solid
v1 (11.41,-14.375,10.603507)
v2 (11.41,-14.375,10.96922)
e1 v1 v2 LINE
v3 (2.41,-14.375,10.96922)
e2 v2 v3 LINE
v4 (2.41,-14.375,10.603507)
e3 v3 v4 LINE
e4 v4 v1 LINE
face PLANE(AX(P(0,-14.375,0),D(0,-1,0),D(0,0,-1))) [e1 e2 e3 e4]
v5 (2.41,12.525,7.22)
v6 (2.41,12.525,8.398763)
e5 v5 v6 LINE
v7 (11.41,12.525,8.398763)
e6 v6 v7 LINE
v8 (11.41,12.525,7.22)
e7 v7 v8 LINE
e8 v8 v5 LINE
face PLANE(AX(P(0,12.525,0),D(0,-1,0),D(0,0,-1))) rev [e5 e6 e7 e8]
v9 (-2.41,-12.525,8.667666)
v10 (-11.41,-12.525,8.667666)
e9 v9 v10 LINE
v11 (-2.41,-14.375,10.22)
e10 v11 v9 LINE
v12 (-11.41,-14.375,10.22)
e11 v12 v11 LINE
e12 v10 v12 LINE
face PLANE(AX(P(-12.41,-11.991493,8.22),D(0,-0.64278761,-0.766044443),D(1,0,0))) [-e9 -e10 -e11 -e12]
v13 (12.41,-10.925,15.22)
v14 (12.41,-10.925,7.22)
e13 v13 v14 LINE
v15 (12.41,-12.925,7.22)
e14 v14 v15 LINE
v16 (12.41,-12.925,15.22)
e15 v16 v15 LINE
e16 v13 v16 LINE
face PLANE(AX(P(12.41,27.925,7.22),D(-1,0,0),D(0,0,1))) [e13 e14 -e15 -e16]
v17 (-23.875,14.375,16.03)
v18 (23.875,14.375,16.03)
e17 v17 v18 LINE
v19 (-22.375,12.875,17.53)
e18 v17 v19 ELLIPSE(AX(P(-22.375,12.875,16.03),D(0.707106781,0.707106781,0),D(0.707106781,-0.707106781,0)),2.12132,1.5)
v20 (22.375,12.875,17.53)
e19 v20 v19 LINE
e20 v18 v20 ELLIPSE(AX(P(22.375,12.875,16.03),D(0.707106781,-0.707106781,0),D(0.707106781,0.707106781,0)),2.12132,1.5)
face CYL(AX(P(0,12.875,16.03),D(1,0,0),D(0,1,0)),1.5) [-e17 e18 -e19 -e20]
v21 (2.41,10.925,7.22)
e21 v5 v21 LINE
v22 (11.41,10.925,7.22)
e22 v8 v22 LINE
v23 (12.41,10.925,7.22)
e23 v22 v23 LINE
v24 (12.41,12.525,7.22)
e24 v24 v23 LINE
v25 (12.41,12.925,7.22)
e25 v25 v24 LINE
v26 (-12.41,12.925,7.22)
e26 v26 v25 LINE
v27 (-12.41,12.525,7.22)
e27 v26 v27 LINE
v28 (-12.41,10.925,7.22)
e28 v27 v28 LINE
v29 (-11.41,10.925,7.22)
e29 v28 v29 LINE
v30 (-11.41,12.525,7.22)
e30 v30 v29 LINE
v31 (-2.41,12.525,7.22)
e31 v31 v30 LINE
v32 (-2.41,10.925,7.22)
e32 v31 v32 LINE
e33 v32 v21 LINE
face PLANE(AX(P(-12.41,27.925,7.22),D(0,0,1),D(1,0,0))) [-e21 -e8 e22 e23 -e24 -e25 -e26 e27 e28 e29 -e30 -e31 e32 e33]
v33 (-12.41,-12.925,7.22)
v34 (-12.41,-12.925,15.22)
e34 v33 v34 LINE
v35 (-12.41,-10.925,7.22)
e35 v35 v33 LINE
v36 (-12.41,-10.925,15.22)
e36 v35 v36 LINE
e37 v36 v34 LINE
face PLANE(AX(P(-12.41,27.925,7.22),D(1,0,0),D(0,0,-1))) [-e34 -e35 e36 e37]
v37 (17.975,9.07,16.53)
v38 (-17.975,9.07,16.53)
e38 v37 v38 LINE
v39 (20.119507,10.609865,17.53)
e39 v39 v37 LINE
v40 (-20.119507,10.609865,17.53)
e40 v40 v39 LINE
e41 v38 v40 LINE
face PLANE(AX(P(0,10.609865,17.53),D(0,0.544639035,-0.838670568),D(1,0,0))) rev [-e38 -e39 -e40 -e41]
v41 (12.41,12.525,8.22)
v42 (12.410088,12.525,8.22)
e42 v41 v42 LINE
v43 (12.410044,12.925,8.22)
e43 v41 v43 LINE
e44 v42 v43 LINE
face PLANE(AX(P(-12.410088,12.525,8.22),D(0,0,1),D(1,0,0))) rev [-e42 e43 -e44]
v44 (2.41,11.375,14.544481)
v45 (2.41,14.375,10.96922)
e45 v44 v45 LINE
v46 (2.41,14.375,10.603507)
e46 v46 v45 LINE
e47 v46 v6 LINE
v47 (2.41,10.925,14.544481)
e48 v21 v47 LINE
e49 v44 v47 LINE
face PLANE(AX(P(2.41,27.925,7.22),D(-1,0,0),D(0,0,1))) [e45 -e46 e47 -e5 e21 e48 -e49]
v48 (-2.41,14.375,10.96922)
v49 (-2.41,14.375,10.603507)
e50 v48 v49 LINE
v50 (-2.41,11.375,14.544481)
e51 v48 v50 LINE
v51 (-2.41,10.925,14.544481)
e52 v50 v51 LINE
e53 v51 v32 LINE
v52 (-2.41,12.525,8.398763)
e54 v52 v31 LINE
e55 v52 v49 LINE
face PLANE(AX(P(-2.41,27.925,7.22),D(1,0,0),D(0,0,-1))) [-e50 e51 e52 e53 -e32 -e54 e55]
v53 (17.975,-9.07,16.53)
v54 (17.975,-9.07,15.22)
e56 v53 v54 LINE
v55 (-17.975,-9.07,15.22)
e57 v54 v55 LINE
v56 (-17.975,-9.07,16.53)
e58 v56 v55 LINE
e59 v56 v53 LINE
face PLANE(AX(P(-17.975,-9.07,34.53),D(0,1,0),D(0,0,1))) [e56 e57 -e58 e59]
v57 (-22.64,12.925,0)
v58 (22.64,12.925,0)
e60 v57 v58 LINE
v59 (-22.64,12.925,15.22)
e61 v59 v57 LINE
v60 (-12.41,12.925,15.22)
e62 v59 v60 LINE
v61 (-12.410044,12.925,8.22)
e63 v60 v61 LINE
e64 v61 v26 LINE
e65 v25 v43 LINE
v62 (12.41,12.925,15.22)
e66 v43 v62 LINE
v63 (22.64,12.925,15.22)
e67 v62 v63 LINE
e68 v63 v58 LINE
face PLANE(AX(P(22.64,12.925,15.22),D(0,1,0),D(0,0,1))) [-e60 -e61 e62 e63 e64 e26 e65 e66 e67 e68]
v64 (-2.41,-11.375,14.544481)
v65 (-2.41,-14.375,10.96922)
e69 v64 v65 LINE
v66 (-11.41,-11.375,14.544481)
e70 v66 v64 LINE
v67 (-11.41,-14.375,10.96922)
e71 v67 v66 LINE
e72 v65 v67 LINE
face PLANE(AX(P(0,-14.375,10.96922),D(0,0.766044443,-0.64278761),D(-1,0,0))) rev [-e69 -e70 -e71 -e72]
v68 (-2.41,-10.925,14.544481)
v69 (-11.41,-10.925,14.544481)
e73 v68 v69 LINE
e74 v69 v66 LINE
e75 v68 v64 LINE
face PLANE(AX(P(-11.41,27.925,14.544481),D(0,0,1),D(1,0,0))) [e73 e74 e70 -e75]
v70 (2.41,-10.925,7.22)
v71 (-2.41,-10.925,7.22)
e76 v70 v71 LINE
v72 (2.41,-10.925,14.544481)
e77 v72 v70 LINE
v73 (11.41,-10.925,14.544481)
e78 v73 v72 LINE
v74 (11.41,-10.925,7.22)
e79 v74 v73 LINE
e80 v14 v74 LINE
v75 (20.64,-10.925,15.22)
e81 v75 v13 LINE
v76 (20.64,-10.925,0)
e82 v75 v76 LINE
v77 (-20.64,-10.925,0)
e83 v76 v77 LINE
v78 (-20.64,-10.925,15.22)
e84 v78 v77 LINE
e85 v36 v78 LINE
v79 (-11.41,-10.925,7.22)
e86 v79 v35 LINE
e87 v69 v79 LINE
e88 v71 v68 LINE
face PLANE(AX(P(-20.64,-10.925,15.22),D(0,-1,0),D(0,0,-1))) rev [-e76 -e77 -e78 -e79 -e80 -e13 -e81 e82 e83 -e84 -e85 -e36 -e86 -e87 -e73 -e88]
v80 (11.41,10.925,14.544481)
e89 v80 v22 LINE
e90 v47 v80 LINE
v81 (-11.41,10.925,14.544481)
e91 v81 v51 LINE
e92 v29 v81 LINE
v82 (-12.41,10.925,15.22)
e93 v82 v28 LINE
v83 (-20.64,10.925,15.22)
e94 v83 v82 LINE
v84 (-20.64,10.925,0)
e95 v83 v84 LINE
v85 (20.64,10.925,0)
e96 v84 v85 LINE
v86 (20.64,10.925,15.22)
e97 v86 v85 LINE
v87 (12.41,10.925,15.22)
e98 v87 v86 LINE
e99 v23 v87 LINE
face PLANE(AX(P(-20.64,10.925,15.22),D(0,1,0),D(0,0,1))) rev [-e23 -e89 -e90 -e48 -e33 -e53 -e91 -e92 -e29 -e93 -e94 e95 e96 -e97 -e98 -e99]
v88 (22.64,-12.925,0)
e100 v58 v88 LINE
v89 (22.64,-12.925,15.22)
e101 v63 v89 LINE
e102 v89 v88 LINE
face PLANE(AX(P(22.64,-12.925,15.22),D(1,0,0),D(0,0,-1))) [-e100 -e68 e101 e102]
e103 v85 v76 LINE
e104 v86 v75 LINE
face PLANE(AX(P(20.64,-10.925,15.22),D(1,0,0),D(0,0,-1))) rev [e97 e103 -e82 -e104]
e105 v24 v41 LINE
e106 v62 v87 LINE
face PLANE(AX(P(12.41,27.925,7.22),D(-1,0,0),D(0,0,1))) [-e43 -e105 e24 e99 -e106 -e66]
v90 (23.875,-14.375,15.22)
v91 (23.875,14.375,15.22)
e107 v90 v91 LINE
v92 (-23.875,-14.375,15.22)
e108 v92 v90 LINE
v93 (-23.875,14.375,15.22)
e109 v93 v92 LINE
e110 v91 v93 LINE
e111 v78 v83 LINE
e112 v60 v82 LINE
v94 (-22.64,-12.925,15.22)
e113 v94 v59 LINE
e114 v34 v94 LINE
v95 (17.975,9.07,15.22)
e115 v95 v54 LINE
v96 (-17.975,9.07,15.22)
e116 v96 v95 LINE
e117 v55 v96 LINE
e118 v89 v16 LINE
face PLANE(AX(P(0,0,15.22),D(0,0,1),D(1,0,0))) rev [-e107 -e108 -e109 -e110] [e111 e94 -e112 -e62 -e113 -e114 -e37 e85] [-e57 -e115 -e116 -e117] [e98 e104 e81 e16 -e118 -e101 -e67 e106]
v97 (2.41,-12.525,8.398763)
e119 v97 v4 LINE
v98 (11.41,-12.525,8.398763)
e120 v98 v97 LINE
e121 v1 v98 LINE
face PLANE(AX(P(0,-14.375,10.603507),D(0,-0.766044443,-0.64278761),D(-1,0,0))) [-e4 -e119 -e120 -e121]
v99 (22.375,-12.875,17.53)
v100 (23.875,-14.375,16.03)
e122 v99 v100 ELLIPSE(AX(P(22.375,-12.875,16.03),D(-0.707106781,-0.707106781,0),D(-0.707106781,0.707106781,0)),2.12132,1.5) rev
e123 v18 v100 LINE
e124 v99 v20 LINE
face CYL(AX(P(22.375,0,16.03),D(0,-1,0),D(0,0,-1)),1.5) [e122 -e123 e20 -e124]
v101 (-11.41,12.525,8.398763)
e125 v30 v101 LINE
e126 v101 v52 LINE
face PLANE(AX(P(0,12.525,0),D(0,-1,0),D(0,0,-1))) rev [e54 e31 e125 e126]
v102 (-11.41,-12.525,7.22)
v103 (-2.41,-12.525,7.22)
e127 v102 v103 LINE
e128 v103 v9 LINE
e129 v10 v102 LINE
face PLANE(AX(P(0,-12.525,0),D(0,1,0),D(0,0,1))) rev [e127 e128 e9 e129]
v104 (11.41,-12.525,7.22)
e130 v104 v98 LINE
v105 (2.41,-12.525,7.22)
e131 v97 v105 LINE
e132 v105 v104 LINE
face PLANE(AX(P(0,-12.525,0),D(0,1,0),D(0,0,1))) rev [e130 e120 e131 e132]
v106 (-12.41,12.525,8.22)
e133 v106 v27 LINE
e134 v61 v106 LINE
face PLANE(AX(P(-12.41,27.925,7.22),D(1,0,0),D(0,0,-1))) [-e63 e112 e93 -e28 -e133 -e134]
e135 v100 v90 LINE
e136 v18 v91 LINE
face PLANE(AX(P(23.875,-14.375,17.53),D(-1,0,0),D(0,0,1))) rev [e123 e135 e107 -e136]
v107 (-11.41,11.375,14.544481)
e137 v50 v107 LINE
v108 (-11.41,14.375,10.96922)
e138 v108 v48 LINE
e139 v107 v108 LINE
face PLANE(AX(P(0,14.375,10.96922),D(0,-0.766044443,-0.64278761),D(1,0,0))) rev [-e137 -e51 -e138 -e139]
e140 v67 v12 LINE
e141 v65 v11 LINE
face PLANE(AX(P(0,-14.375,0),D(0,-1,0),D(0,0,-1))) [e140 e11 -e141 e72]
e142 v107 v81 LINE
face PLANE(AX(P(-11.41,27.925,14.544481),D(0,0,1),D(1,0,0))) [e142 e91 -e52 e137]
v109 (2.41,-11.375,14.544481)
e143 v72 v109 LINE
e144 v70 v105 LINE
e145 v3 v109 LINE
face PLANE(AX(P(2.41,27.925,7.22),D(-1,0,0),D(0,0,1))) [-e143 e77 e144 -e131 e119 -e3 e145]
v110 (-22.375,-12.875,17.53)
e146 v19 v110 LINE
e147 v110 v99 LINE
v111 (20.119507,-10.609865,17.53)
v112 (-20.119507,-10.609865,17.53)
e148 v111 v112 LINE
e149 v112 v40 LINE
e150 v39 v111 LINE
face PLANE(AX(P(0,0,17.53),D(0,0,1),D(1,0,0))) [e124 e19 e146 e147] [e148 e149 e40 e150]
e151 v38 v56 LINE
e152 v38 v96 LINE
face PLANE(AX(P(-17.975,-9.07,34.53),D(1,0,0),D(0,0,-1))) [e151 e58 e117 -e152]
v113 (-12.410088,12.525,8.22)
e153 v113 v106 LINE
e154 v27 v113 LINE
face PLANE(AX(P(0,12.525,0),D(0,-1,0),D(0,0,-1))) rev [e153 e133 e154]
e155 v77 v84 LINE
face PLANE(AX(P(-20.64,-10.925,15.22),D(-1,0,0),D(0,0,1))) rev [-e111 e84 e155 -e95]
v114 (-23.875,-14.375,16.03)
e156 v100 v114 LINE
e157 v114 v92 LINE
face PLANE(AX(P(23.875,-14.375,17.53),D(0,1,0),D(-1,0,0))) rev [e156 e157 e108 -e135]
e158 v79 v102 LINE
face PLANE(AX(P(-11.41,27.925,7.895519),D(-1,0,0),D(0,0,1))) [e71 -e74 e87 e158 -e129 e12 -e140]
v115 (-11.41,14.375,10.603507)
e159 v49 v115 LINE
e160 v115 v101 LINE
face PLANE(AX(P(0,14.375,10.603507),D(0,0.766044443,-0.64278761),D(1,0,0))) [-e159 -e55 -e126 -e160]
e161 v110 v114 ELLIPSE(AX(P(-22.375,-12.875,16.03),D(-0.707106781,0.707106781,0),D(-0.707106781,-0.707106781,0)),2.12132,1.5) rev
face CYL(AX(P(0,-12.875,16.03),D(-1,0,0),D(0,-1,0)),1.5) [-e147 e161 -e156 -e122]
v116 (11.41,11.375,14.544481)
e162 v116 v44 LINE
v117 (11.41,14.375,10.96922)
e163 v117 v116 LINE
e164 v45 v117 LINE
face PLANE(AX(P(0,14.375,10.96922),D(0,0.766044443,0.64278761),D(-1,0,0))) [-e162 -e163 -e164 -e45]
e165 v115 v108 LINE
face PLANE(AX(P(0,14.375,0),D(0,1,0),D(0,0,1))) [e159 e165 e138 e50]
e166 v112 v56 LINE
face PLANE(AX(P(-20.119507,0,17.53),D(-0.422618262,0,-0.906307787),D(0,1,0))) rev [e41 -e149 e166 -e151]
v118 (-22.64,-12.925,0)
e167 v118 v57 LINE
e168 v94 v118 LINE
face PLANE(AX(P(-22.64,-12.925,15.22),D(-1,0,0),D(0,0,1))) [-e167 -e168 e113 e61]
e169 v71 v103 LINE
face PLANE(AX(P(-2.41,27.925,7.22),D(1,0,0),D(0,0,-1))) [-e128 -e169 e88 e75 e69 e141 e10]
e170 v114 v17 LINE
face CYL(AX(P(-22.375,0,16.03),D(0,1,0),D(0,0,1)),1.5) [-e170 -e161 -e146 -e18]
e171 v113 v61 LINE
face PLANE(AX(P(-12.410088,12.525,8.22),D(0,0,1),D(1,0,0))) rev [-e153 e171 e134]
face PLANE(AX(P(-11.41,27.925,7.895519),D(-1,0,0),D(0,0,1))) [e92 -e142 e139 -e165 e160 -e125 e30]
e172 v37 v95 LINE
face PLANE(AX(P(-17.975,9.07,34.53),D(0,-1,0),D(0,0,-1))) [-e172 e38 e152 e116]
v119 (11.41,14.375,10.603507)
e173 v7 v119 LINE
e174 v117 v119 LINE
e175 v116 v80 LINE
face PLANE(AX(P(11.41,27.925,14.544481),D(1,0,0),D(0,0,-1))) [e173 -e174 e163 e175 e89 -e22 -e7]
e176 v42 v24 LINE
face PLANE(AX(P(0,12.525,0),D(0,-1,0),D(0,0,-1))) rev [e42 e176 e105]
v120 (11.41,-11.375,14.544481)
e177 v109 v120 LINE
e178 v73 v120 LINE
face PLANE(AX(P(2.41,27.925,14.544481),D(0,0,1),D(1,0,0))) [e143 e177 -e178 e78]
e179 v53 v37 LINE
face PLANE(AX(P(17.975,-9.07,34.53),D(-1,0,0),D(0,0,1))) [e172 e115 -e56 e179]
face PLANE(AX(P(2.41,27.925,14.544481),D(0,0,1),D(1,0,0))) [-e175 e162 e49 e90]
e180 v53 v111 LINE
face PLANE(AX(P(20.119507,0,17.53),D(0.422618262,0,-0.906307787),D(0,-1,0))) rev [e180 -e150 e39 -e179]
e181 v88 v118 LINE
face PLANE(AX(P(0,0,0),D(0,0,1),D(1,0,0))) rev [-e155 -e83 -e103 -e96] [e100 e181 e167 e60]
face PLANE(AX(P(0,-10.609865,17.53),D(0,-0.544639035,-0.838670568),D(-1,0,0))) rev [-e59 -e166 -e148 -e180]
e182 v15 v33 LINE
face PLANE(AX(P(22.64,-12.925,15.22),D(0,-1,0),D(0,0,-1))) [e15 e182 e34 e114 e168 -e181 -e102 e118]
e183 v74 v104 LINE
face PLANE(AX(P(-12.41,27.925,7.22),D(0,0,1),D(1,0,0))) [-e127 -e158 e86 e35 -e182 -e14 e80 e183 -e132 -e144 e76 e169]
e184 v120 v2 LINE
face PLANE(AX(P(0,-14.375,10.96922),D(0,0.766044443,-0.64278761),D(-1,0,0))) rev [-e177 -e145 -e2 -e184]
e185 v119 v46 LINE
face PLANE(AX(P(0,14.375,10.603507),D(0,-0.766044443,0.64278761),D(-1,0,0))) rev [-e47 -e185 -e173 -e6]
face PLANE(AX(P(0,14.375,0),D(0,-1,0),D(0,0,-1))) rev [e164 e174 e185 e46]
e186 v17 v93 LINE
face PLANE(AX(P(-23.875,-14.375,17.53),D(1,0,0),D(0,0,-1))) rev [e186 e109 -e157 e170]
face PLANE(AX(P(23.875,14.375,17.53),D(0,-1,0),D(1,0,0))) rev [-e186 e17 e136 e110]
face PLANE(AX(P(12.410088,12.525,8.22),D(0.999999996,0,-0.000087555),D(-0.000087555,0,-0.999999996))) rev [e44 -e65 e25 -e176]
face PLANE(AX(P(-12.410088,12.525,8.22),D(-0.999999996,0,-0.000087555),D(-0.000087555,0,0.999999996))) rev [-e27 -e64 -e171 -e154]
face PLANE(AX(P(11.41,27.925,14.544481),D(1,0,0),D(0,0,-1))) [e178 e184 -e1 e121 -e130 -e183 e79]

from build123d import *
from OCP.BRepFilletAPI import BRepFilletAPI_MakeChamfer

# Parameters (mm, degrees)
ESBO_O1_W                  = 47.75
ESBO_O1_H                  = 28.75
RESSALTO_EXTRUS_O1_DEPTH   = 17.53
ESBO_O3_W                  = 55.113346814
ESBO_O3_H                  = 32.23245858
ESBO_O3_W_2                = 45.28
ESBO_O3_H_2                = 25.85
CORTE_EXTRUS_O1_DEPTH      = 15.22
CORTE_EXTRUS_O2_DEPTH      = 17
CORTE_EXTRUS_O2_DEPTH_BACK = 33.22
ESBO_O4_W                  = 35.95
ESBO_O4_H                  = 18.14
ESBO_O5_W                  = 41.28
ESBO_O5_H                  = 21.85
CORTE_EXTRUS_O3_DEPTH      = 15.22
CHANFRO1_SIZE              = 1
CHANFRO1_SIZE2             = 2.144506921
CHANFRO2_SIZE              = 1
CHANFRO2_SIZE2             = 2.144506921
CHANFRO3_SIZE              = 1
CHANFRO3_SIZE2             = 1.539864964
FILETE1_R                  = 1.5
CORTE_EXTRUS_O4_DEPTH      = 15
CORTE_EXTRUS_O4_DEPTH_BACK = 44.22
CORTE_EXTRUS_O5_DEPTH      = 0.4
ESBO_O8_W                  = 24.82
ESBO_O8_H                  = 1
CORTE_EXTRUS_O6_DEPTH      = 0.4
ESBO_O9_W                  = 9
ESBO_O9_H                  = 6.324480946
RESSALTO_EXTRUS_O2_DEPTH   = 1.45
ESBO_O10_W                 = 9
ESBO_O10_H                 = 6.324480946
RESSALTO_EXTRUS_O3_DEPTH   = 1.45
ESBO_O11_W                 = 9
ESBO_O11_H                 = 6.324480946
RESSALTO_EXTRUS_O4_DEPTH   = 1.45
CHANFRO4_SIZE              = 3
CHANFRO4_SIZE2             = 3.575260778


with BuildPart() as part:
    # Esboço1 → Ressalto-extrusão1 (new body)
    with BuildSketch(Plane.XY):
        Rectangle(ESBO_O1_W, ESBO_O1_H)
    extrude(amount=RESSALTO_EXTRUS_O1_DEPTH)

    # Esboço3 → Corte-extrusão1 (cut)
    with BuildSketch(Plane(origin=(0, 0, 0), x_dir=(-1, 0, 0), z_dir=(0, 0, -1))):
        Rectangle(ESBO_O3_W, ESBO_O3_H)
        Rectangle(ESBO_O3_W_2, ESBO_O3_H_2, mode=Mode.SUBTRACT)
    extrude(amount=-CORTE_EXTRUS_O1_DEPTH, mode=Mode.SUBTRACT)

    # Esboço4 → Corte-extrusão2 (cut, two sides: drawn at the far end of the back side and taken through both)
    with BuildSketch(Plane.XY.offset(17.53).offset(-CORTE_EXTRUS_O2_DEPTH_BACK)):
        Rectangle(ESBO_O4_W, ESBO_O4_H)
    extrude(amount=CORTE_EXTRUS_O2_DEPTH + CORTE_EXTRUS_O2_DEPTH_BACK, mode=Mode.SUBTRACT)

    # Esboço5 → Corte-extrusão3 (cut)
    with BuildSketch(Plane(origin=(0, 0, 0), x_dir=(-1, 0, 0), z_dir=(0, 0, -1))):
        Rectangle(ESBO_O5_W, ESBO_O5_H)
    extrude(amount=-CORTE_EXTRUS_O3_DEPTH, mode=Mode.SUBTRACT)

    # Chanfro1
    chanfro1_edges = [part.edges().sort_by_distance(p)[0] for p in [
        (17.975, 0, 17.53),
    ]]
    chanfro1_side = [part.faces().sort_by_distance(p)[0] for p in [
        (17.975, 0, 16.375),
    ]]
    chamfer(chanfro1_edges, length=CHANFRO1_SIZE, length2=CHANFRO1_SIZE2, reference=chanfro1_side[0])

    # Chanfro2
    chanfro2_edges = [part.edges().sort_by_distance(p)[0] for p in [
        (-17.975, 0, 17.53),
    ]]
    chanfro2_side = [part.faces().sort_by_distance(p)[0] for p in [
        (-17.975, 0, 16.375),
    ]]
    chamfer(chanfro2_edges, length=CHANFRO2_SIZE, length2=CHANFRO2_SIZE2, reference=chanfro2_side[0])

    # Chanfro3: one chamfer whose edges measure the first distance from different faces: ONE call of the kernel's chamfer builder (chamfer() names one face for all edges)
    chanfro3_edges_1 = [part.edges().sort_by_distance(p)[0] for p in [
        (0, -9.07, 17.53),
    ]]
    chanfro3_side_1 = [part.faces().sort_by_distance(p)[0] for p in [
        (0, -9.07, 16.39568424),
    ]]
    chanfro3_edges_2 = [part.edges().sort_by_distance(p)[0] for p in [
        (0, 9.07, 17.53),
    ]]
    chanfro3_side_2 = [part.faces().sort_by_distance(p)[0] for p in [
        (0, 9.07, 16.39568424),
    ]]
    chanfro3 = BRepFilletAPI_MakeChamfer(part.part.solid().wrapped)
    for e in chanfro3_edges_1:
        chanfro3.Add(CHANFRO3_SIZE, CHANFRO3_SIZE2, e.wrapped, chanfro3_side_1[0].wrapped)  # the first distance lies on this face
    for e in chanfro3_edges_2:
        chanfro3.Add(CHANFRO3_SIZE, CHANFRO3_SIZE2, e.wrapped, chanfro3_side_2[0].wrapped)  # the first distance lies on this face
    add(Compound.cast(chanfro3.Shape()), mode=Mode.REPLACE)

    # Filete1
    filete1_edges = [part.edges().sort_by_distance(p)[0] for p in [
        (23.875, 0, 17.53),
        (0, 14.375, 17.53),
        (-23.875, 0, 17.53),
        (0, -14.375, 17.53),
    ]]
    fillet(filete1_edges, radius=FILETE1_R)

    # Esboço6 → Corte-extrusão4 (cut, two sides: drawn at the far end of the back side and taken through both)
    with BuildSketch(Plane(origin=(0, 12.925, 0), x_dir=(1, 0, 0), z_dir=(0, 1, 0)).offset(-CORTE_EXTRUS_O4_DEPTH_BACK)):
        Polygon((-11.41, -7.895519054), (-11.41, -7.22), (-12.41, -7.22), (-12.41, -15.22), (12.41, -15.22), (12.41, -7.22), (11.41, -7.22), (11.41, -7.895519054), (11.41, -14.544480946), (2.41, -14.544480946), (2.41, -7.22), (-2.41, -7.22), (-2.41, -14.544480946), (-11.41, -14.544480946), align=None)
    extrude(amount=CORTE_EXTRUS_O4_DEPTH + CORTE_EXTRUS_O4_DEPTH_BACK, mode=Mode.SUBTRACT)

    # Esboço7 → Corte-extrusão5 (cut)
    with BuildSketch(Plane(origin=(0, 12.925, 0), x_dir=(1, 0, 0), z_dir=(0, 1, 0))):
        Polygon((-12.410087555, -8.22), (12.410087555, -8.22), (12.41, -7.22), (-12.41, -7.22), align=None)
    extrude(amount=-CORTE_EXTRUS_O5_DEPTH, mode=Mode.SUBTRACT)

    # Esboço8 → Corte-extrusão6 (cut)
    with BuildSketch(Plane.XZ.offset(12.925)):
        with Locations((0, 7.72)):
            Rectangle(ESBO_O8_W, ESBO_O8_H)
    extrude(amount=-CORTE_EXTRUS_O6_DEPTH, mode=Mode.SUBTRACT)

    # Esboço9 → Ressalto-extrusão2 (add)
    with BuildSketch(Plane(origin=(0, 12.925, 0), x_dir=(1, 0, 0), z_dir=(0, 1, 0))):
        with Locations((-6.91, -11.382240473)):
            Rectangle(ESBO_O9_W, ESBO_O9_H)
    extrude(amount=RESSALTO_EXTRUS_O2_DEPTH)

    # Esboço10 → Ressalto-extrusão3 (add)
    with BuildSketch(Plane(origin=(0, 12.925, 0), x_dir=(1, 0, 0), z_dir=(0, 1, 0))):
        with Locations((6.91, -11.382240473)):
            Rectangle(ESBO_O10_W, ESBO_O10_H)
    extrude(amount=RESSALTO_EXTRUS_O3_DEPTH)

    # Esboço11 → Ressalto-extrusão4 (add)
    with BuildSketch(Plane.XZ.offset(12.925)):
        with Locations((6.91, 11.382240473)):
            Rectangle(ESBO_O11_W, ESBO_O11_H)
        Polygon((-2.41, 8.22), (-2.41, 14.544480946), (-6.91, 14.544480946), (-11.41, 14.544480946), (-11.41, 8.22), align=None)
    extrude(amount=RESSALTO_EXTRUS_O4_DEPTH)

    # Chanfro4: one chamfer whose edges measure the first distance from different faces: ONE call of the kernel's chamfer builder (chamfer() names one face for all edges)
    chanfro4_edges_1 = [part.edges().sort_by_distance(p)[0] for p in [
        (-6.91, 14.375, 14.544480946),
    ]]
    chanfro4_side_1 = [part.faces().sort_by_distance(p)[0] for p in [
        (-6.91, 12.65, 14.544480946),
    ]]
    chanfro4_edges_2 = [part.edges().sort_by_distance(p)[0] for p in [
        (6.91, 14.375, 14.544480946),
    ]]
    chanfro4_side_2 = [part.faces().sort_by_distance(p)[0] for p in [
        (6.91, 12.65, 14.544480946),
    ]]
    chanfro4_edges_3 = [part.edges().sort_by_distance(p)[0] for p in [
        (6.91, -14.375, 14.544480946),
    ]]
    chanfro4_side_3 = [part.faces().sort_by_distance(p)[0] for p in [
        (6.91, -12.65, 14.544480946),
    ]]
    chanfro4_edges_4 = [part.edges().sort_by_distance(p)[0] for p in [
        (-6.91, -14.375, 14.544480946),
    ]]
    chanfro4_side_4 = [part.faces().sort_by_distance(p)[0] for p in [
        (-6.91, -12.65, 14.544480946),
    ]]
    chanfro4 = BRepFilletAPI_MakeChamfer(part.part.solid().wrapped)
    for e in chanfro4_edges_1:
        chanfro4.Add(CHANFRO4_SIZE, CHANFRO4_SIZE2, e.wrapped, chanfro4_side_1[0].wrapped)  # the first distance lies on this face
    for e in chanfro4_edges_2:
        chanfro4.Add(CHANFRO4_SIZE, CHANFRO4_SIZE2, e.wrapped, chanfro4_side_2[0].wrapped)  # the first distance lies on this face
    for e in chanfro4_edges_3:
        chanfro4.Add(CHANFRO4_SIZE, CHANFRO4_SIZE2, e.wrapped, chanfro4_side_3[0].wrapped)  # the first distance lies on this face
    for e in chanfro4_edges_4:
        chanfro4.Add(CHANFRO4_SIZE, CHANFRO4_SIZE2, e.wrapped, chanfro4_side_4[0].wrapped)  # the first distance lies on this face
    add(Compound.cast(chanfro4.Shape()), mode=Mode.REPLACE)

    # Chanfro5
    # the kernel refuses this chamfer: 2.383507185, 2 mm, written as the material it takes off along each edge
    with BuildSketch(Plane(origin=(-11.41, 14.375, 8.22), x_dir=(0, 0.024939322090234445, 0.9996889667359941), z_dir=(1, 0, 0))) as chanfro5_piece_1_section:
        with BuildLine():
            Line((2.457306387, 0), (-0.124419196, 2.058820987))
            Line((-0.124419196, 2.058820987), (-0.172074512, 2.057632126))
            ThreePointArc((-0.172074512, 2.057632126), (-0.073358824, 1.029132353), (-0.047655317, -0.001188861))
            Line((-0.047655317, -0.001188861), (0.001188861, -0.047655317))
            ThreePointArc((0.001188861, -0.047655317), (1.229077869, -0.01702307), (2.458495248, -0.047655317))
            Line((2.458495248, -0.047655317), (2.457306387, 0))
        make_face()
    chanfro5_piece_1 = extrude(amount=9, mode=Mode.PRIVATE)
    chanfro5_piece_1 = split(chanfro5_piece_1, bisect_by=Plane(origin=(-6.91, 12.525, 9.020332746), z_dir=(0, 1, 0)), keep=Keep.TOP, mode=Mode.PRIVATE)
    add(chanfro5_piece_1, mode=Mode.SUBTRACT)
    with BuildSketch(Plane(origin=(11.41, 14.375, 8.22), x_dir=(0, 0.024939322090234445, 0.9996889667359941), z_dir=(-1, 0, 0))) as chanfro5_piece_2_section:
        with BuildLine():
            Line((2.457306387, 0), (-0.124419196, -2.058820987))
            Line((-0.124419196, -2.058820987), (-0.172074512, -2.057632126))
            ThreePointArc((-0.172074512, -2.057632126), (-0.073358824, -1.029132353), (-0.047655317, 0.001188861))
            Line((-0.047655317, 0.001188861), (0.001188861, 0.047655317))
            ThreePointArc((0.001188861, 0.047655317), (1.229077869, 0.01702307), (2.458495248, 0.047655317))
            Line((2.458495248, 0.047655317), (2.457306387, 0))
        make_face()
    chanfro5_piece_2 = extrude(amount=9, mode=Mode.PRIVATE)
    chanfro5_piece_2 = split(chanfro5_piece_2, bisect_by=Plane(origin=(6.91, 12.525, 9.020332746), z_dir=(0, 1, 0)), keep=Keep.TOP, mode=Mode.PRIVATE)
    add(chanfro5_piece_2, mode=Mode.SUBTRACT)
    with BuildSketch(Plane(origin=(2.41, -14.375, 8.22), x_dir=(0, -0.024939322090234445, 0.9996889667359941), z_dir=(1, 0, 0))) as chanfro5_piece_3_section:
        with BuildLine():
            Line((2.457306387, 0), (-0.124419196, -2.058820987))
            Line((-0.124419196, -2.058820987), (-0.172074512, -2.057632126))
            ThreePointArc((-0.172074512, -2.057632126), (-0.073358824, -1.029132353), (-0.047655317, 0.001188861))
            Line((-0.047655317, 0.001188861), (0.001188861, 0.047655317))
            ThreePointArc((0.001188861, 0.047655317), (1.229077869, 0.01702307), (2.458495248, 0.047655317))
            Line((2.458495248, 0.047655317), (2.457306387, 0))
        make_face()
    chanfro5_piece_3 = extrude(amount=9, mode=Mode.PRIVATE)
    chanfro5_piece_3 = split(chanfro5_piece_3, bisect_by=Plane(origin=(6.91, -12.525, 9.020332746), z_dir=(0, -1, 0)), keep=Keep.TOP, mode=Mode.PRIVATE)
    add(chanfro5_piece_3, mode=Mode.SUBTRACT)
    with BuildSketch(Plane(origin=(-11.41, -14.375, 8.22), x_dir=(0, -0.03540953691366296, 0.9993728857116145), z_dir=(1, 0, 0))) as chanfro5_piece_4_section:
        with BuildLine():
            Line((2.062577027, 0), (-0.148230141, -2.452831528))
            Line((-0.148230141, -2.452831528), (-0.19587039, -2.45114355))
            ThreePointArc((-0.19587039, -2.45114355), (-0.091132758, -1.225812797), (-0.047640249, 0.001687978))
            Line((-0.047640249, 0.001687978), (0.001687978, 0.047640249))
            ThreePointArc((0.001687978, 0.047640249), (1.031683425, 0.011145701), (2.064265005, 0.047640249))
            Line((2.064265005, 0.047640249), (2.062577027, 0))
        make_face()
    chanfro5_piece_4 = extrude(amount=9, mode=Mode.PRIVATE)
    chanfro5_piece_4 = split(chanfro5_piece_4, bisect_by=Plane(origin=(-6.91, -12.525, 8.913974099), z_dir=(0, -1, 0)), keep=Keep.TOP, mode=Mode.PRIVATE)
    add(chanfro5_piece_4, mode=Mode.SUBTRACT)


solid = part.part
